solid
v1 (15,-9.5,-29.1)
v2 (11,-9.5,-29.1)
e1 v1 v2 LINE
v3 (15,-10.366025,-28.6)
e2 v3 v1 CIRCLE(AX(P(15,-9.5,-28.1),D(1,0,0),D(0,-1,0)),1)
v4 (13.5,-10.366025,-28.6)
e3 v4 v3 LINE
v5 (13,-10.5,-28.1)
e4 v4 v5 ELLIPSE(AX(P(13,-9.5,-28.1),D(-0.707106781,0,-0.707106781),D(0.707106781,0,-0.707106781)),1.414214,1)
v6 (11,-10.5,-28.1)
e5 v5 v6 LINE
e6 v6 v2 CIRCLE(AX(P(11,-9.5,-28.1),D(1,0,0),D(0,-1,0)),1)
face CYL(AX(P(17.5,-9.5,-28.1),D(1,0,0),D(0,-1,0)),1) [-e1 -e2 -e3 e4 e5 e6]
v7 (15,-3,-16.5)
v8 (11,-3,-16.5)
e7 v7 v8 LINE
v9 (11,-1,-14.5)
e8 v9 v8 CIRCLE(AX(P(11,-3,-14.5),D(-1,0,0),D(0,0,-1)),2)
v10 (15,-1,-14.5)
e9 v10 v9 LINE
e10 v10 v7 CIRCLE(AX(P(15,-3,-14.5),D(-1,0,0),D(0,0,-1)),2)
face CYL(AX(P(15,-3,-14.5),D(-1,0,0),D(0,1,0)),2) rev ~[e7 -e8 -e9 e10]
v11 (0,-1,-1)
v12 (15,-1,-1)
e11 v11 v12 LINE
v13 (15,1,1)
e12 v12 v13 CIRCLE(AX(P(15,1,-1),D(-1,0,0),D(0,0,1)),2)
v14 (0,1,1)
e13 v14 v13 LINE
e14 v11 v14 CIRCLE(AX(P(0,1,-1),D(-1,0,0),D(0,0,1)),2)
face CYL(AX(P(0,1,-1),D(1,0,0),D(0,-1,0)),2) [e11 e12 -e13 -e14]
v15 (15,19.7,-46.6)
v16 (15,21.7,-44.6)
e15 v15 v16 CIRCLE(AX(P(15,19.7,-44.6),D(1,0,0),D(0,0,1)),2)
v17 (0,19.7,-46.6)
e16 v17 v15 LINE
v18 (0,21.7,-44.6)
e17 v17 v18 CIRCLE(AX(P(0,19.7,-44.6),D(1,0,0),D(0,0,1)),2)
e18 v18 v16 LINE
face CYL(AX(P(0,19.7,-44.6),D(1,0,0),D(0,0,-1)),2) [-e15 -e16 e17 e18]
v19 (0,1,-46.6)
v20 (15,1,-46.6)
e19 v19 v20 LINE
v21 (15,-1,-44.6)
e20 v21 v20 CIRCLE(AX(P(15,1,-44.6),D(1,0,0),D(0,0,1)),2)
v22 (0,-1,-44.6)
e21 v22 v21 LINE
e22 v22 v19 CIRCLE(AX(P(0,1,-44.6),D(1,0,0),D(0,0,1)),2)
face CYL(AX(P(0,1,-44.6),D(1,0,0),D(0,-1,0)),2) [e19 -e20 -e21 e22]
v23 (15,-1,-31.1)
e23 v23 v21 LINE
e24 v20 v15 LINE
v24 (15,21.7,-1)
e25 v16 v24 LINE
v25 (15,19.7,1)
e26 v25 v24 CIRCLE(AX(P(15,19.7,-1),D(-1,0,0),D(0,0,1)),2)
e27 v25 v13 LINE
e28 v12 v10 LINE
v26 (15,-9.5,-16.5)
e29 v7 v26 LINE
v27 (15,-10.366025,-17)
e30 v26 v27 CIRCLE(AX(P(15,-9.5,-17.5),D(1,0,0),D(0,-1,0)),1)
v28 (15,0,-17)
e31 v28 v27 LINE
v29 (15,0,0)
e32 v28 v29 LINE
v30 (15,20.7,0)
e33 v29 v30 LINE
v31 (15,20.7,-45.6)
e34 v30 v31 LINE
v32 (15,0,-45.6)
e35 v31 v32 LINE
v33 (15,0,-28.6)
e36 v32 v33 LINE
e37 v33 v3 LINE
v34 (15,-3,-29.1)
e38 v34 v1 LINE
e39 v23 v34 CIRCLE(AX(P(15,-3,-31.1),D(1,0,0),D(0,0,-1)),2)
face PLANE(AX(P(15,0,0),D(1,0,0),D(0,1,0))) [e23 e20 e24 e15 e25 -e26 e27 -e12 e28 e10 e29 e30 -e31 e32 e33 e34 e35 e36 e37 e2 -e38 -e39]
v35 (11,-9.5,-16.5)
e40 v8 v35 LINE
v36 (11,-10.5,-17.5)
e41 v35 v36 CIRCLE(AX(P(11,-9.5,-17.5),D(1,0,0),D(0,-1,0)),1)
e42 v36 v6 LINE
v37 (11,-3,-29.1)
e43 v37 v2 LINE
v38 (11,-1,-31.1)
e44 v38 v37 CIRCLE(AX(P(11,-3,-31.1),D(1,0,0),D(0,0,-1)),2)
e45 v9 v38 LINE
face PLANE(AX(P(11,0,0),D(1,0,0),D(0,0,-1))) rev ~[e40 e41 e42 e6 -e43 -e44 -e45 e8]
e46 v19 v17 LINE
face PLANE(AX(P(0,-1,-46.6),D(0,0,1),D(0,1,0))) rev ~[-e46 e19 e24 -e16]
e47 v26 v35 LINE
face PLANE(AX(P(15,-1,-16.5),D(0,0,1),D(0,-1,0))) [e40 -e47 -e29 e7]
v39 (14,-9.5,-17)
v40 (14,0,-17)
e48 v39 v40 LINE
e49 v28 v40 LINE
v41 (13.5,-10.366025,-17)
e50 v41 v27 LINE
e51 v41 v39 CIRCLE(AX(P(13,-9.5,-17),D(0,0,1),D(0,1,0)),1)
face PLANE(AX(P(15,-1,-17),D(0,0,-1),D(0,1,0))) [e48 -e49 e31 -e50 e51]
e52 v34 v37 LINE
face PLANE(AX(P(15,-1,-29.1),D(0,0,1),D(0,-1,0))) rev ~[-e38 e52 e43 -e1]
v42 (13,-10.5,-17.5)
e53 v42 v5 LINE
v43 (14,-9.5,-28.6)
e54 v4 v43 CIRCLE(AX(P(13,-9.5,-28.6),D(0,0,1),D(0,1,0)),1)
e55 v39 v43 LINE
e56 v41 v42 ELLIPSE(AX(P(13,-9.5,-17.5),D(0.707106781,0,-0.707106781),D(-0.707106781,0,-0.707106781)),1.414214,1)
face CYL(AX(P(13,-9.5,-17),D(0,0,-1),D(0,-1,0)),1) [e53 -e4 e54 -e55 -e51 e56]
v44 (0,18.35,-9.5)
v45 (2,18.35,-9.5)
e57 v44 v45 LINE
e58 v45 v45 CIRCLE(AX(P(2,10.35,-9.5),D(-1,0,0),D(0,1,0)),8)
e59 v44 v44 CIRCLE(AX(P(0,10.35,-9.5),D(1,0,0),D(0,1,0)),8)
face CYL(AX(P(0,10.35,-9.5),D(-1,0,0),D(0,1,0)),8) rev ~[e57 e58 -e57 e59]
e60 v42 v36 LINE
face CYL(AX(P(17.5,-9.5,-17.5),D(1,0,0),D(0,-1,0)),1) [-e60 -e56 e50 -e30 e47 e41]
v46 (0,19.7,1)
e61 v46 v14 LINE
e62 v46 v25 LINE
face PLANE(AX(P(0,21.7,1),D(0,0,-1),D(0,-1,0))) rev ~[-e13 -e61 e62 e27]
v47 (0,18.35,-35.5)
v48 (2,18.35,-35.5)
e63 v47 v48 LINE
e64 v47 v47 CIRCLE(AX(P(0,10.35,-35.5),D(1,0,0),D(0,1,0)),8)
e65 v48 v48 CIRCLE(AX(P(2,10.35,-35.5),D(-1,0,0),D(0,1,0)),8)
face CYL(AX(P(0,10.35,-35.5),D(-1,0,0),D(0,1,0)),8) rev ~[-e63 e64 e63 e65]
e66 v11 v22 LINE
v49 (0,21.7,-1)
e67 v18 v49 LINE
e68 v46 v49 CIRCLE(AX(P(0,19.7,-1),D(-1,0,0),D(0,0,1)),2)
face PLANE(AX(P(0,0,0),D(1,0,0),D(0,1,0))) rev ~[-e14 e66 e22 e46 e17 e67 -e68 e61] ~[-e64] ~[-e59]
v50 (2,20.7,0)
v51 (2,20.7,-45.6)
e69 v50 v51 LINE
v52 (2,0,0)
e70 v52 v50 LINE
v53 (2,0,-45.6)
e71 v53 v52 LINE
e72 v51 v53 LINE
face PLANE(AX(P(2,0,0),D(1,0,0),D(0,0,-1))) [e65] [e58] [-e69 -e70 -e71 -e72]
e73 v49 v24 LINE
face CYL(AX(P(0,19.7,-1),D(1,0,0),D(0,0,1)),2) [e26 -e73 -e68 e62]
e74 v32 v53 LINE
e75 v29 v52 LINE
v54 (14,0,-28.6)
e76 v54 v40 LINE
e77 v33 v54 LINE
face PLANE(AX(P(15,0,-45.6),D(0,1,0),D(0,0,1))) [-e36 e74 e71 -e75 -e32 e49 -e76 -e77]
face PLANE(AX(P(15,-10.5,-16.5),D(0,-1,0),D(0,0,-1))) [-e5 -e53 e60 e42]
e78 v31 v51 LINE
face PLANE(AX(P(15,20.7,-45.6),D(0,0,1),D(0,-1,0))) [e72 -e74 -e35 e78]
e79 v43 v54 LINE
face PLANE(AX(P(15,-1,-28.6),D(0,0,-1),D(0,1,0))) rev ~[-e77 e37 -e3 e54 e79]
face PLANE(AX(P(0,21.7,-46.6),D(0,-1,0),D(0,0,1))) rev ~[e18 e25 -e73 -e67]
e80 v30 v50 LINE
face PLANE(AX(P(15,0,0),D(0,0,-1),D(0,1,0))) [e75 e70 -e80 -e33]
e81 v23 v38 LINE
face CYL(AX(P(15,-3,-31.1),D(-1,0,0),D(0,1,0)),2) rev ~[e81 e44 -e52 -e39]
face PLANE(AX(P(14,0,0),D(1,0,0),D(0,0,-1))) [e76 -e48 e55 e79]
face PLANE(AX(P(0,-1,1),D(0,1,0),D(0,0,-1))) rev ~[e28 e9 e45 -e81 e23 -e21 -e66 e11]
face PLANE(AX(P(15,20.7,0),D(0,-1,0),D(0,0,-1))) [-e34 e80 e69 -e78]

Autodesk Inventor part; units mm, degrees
ref_plane "YZ Plane" through (0, 0, 0) normal (1, 0, 0) x (0, 1, 0)
ref_plane "XZ Plane" through (0, 0, 0) normal (0, 1, 0) x (-1, 0, 0)
ref_plane "XY Plane" through (0, 0, 0) normal (0, 0, 1) x (1, 0, 0)
sketch "Sketch1" plane through (0, 0, 0) normal (1, 0, 0) x (0, 1, 0)
  line L0 (0, 0) -> (20.7, 0)
  line L1 (20.7, 0) -> (20.7, -45.6)
  line L2 (20.7, -45.6) -> (0, -45.6)
  line L3 (0, -45.6) -> (0, 0)
  circle A0 centre (10.35, -9.5) radius 8
  circle A1 centre (10.35, -35.5) radius 8
  line L4 (21.7, -46.6) -> (21.7, 1)
  line L5 (21.7, 1) -> (-1, 1)
  line L6 (-1, 1) -> (-1, -46.6)
  line L7 (-1, -46.6) -> (21.7, -46.6)
  dimension "Breite" = 20.7
  dimension "Länge" = 45.6
  dimension "Kreise1" = 16
  dimension "BreiteBisKreise1" = 9.5
  dimension "LangeBisKreise" = 10.35
  dimension "KreiseCenter1BisKreiseCenter2" = 26
  dimension "Kreise2" = 16
  dimension "LangeBisKreise2" = 10.35
  dimension "d14" = 1
extrude "Extrusion1" add sketch "Sketch1" along normal blind 15 contours L0 L1 L2 L3 | A0 | A1
extrude "Extrusion2" add sketch "Sketch1" along normal up to surface (15 mm away) contours L7 L6 L5 L4
sketch "Sketch2" plane through (15, 0, 0) normal (1, 0, 0) x (0, 0, -1)
  line L0 (0, 20.7) -> (45.6, 20.7) projected
  line L1 (56.12, 0) -> (-10.52, 0) projected
  line L2 (45.6, 20.7) -> (45.6, 0) projected
  line L3 (0, -5.54) -> (0, 26.24) projected
  line L4 (0, 20.7) -> (45.6, 20.7)
  line L5 (45.6, 20.7) -> (45.6, 0)
  line L6 (45.6, 0) -> (0, 0)
  line L7 (0, 0) -> (0, 20.7)
extrude "Extrusion3" cut sketch "Sketch2" against normal blind 13
extrude "Extrusion4" cut sketch "Sketch1" along normal blind 11 contours A0 | A1
sketch "Sketch3" plane through (15, 0, 0) normal (1, 0, 0) x (0, 0, -1)
  line L0 (45.6, 20.7) -> (45.6, 0) projected
  line L1 (45.6, 0) -> (0, 0) projected
  line L2 (0, 0) -> (0, 20.7) projected
  line L3 (0, 20.7) -> (45.6, 20.7) projected
  line L4 (-1, 21.7) -> (46.6, 21.7) projected
  line L5 (-1, -1) -> (-1, 21.7) projected
  line L6 (46.6, -1) -> (-1, -1) projected
  line L7 (46.6, 21.7) -> (46.6, -1) projected
  line L8 (0, 0) -> (0, 20.7) projected
  line L9 (0, 0) -> (16.5, 0)
  line L10 (45.6, 0) -> (0, 0) projected
  line L11 (45.6, 20.7) -> (45.6, 0) projected
  line L12 (45.6, 0) -> (29.1, 0)
  line L13 (-1, -1) -> (46.6, -1) projected
  line L14 (16.5, -1) -> (16.5, -10.5)
  line L15 (29.1, -1) -> (29.1, -10.5)
  line L16 (16.5, -10.5) -> (29.1, -10.5)
  dimension "d21" = 16.5
  dimension "d22" = 16.5
  dimension "d23" = 9.5
  dimension "d24" = 1
  dimension "d26" = 12.6
extrude "Extrusion5" add sketch "Sketch3" against normal blind 4 contours L6 L15 L16 L14
sketch "Sketch4" plane through (15, 0, 0) normal (1, 0, 0) x (0, 0, -1)
  line L0 (45.6, 20.7) -> (45.6, 0) projected
  line L1 (45.6, 0) -> (0, 0) projected
  line L2 (0, 0) -> (0, 20.7) projected
  line L3 (0, 20.7) -> (45.6, 20.7) projected
  line L4 (-1, 21.7) -> (46.6, 21.7) projected
  line L5 (-1, -1) -> (-1, 21.7) projected
  line L6 (16.5, -1) -> (-1, -1) projected
  line L7 (16.5, -1) -> (16.5, -10.5) projected
  line L8 (16.5, -10.5) -> (29.1, -10.5) projected
  line L9 (29.1, -10.5) -> (29.1, -1) projected
  line L10 (46.6, -1) -> (29.1, -1) projected
  line L11 (46.6, 21.7) -> (46.6, -1) projected
  line L12 (29.1, -10.5) -> (29.1, -1) projected
  line L13 (29.1, -10.5) -> (16.5, -10.5) projected
  line L14 (29.1, -1) -> (16.5, -1)
  line L15 (16.5, -1) -> (16.5, -10.5)
  line L16 (16.5, -10.5) -> (29.1, -10.5)
  line L17 (29.1, -10.5) -> (29.1, -1)
  line L18 (17, -1.5) -> (28.6, -1.5)
  line L19 (28.6, -1.5) -> (28.6, -10)
  line L20 (28.6, -10) -> (17, -10)
  line L21 (17, -10) -> (17, -1.5)
  line L22 (17, -1.5) -> (17, 0)
  line L23 (45.6, 0) -> (0, 0) projected
  line L24 (28.6, -1.5) -> (28.6, 0)
  line L25 (17, 0) -> (28.6, 0)
  line L26 (17, -10) -> (17, -10.5)
  line L27 (28.6, -10) -> (28.6, -10.5)
  dimension "d29" = 0.5
extrude "Extrusion6" cut sketch "Sketch4" against normal blind 1 contours L24 L14 L22 L1 | L24 L18 L22 L14 | L19 L20 L21 L18 | L27 L8 L26 L20
fillet "Fillet1" radius 2 2 edges at (13, -1, -29.1) (13, -1, -16.5)
fillet "Fillet2" radius 2 4 edges at (7.5, -1, 1) (7.5, -1, -46.6) (7.5, 21.7, -46.6) (7.5, 21.7, 1)
fillet "Fillet3" radius 1 1 edges at (14, -10.5, -22.8)
fillet "Fillet4" radius 1 2 edges at (13, -10.5, -29.1) (13, -10.5, -16.5)
properties part number "Ultaschal Sensor Gehäuse"
